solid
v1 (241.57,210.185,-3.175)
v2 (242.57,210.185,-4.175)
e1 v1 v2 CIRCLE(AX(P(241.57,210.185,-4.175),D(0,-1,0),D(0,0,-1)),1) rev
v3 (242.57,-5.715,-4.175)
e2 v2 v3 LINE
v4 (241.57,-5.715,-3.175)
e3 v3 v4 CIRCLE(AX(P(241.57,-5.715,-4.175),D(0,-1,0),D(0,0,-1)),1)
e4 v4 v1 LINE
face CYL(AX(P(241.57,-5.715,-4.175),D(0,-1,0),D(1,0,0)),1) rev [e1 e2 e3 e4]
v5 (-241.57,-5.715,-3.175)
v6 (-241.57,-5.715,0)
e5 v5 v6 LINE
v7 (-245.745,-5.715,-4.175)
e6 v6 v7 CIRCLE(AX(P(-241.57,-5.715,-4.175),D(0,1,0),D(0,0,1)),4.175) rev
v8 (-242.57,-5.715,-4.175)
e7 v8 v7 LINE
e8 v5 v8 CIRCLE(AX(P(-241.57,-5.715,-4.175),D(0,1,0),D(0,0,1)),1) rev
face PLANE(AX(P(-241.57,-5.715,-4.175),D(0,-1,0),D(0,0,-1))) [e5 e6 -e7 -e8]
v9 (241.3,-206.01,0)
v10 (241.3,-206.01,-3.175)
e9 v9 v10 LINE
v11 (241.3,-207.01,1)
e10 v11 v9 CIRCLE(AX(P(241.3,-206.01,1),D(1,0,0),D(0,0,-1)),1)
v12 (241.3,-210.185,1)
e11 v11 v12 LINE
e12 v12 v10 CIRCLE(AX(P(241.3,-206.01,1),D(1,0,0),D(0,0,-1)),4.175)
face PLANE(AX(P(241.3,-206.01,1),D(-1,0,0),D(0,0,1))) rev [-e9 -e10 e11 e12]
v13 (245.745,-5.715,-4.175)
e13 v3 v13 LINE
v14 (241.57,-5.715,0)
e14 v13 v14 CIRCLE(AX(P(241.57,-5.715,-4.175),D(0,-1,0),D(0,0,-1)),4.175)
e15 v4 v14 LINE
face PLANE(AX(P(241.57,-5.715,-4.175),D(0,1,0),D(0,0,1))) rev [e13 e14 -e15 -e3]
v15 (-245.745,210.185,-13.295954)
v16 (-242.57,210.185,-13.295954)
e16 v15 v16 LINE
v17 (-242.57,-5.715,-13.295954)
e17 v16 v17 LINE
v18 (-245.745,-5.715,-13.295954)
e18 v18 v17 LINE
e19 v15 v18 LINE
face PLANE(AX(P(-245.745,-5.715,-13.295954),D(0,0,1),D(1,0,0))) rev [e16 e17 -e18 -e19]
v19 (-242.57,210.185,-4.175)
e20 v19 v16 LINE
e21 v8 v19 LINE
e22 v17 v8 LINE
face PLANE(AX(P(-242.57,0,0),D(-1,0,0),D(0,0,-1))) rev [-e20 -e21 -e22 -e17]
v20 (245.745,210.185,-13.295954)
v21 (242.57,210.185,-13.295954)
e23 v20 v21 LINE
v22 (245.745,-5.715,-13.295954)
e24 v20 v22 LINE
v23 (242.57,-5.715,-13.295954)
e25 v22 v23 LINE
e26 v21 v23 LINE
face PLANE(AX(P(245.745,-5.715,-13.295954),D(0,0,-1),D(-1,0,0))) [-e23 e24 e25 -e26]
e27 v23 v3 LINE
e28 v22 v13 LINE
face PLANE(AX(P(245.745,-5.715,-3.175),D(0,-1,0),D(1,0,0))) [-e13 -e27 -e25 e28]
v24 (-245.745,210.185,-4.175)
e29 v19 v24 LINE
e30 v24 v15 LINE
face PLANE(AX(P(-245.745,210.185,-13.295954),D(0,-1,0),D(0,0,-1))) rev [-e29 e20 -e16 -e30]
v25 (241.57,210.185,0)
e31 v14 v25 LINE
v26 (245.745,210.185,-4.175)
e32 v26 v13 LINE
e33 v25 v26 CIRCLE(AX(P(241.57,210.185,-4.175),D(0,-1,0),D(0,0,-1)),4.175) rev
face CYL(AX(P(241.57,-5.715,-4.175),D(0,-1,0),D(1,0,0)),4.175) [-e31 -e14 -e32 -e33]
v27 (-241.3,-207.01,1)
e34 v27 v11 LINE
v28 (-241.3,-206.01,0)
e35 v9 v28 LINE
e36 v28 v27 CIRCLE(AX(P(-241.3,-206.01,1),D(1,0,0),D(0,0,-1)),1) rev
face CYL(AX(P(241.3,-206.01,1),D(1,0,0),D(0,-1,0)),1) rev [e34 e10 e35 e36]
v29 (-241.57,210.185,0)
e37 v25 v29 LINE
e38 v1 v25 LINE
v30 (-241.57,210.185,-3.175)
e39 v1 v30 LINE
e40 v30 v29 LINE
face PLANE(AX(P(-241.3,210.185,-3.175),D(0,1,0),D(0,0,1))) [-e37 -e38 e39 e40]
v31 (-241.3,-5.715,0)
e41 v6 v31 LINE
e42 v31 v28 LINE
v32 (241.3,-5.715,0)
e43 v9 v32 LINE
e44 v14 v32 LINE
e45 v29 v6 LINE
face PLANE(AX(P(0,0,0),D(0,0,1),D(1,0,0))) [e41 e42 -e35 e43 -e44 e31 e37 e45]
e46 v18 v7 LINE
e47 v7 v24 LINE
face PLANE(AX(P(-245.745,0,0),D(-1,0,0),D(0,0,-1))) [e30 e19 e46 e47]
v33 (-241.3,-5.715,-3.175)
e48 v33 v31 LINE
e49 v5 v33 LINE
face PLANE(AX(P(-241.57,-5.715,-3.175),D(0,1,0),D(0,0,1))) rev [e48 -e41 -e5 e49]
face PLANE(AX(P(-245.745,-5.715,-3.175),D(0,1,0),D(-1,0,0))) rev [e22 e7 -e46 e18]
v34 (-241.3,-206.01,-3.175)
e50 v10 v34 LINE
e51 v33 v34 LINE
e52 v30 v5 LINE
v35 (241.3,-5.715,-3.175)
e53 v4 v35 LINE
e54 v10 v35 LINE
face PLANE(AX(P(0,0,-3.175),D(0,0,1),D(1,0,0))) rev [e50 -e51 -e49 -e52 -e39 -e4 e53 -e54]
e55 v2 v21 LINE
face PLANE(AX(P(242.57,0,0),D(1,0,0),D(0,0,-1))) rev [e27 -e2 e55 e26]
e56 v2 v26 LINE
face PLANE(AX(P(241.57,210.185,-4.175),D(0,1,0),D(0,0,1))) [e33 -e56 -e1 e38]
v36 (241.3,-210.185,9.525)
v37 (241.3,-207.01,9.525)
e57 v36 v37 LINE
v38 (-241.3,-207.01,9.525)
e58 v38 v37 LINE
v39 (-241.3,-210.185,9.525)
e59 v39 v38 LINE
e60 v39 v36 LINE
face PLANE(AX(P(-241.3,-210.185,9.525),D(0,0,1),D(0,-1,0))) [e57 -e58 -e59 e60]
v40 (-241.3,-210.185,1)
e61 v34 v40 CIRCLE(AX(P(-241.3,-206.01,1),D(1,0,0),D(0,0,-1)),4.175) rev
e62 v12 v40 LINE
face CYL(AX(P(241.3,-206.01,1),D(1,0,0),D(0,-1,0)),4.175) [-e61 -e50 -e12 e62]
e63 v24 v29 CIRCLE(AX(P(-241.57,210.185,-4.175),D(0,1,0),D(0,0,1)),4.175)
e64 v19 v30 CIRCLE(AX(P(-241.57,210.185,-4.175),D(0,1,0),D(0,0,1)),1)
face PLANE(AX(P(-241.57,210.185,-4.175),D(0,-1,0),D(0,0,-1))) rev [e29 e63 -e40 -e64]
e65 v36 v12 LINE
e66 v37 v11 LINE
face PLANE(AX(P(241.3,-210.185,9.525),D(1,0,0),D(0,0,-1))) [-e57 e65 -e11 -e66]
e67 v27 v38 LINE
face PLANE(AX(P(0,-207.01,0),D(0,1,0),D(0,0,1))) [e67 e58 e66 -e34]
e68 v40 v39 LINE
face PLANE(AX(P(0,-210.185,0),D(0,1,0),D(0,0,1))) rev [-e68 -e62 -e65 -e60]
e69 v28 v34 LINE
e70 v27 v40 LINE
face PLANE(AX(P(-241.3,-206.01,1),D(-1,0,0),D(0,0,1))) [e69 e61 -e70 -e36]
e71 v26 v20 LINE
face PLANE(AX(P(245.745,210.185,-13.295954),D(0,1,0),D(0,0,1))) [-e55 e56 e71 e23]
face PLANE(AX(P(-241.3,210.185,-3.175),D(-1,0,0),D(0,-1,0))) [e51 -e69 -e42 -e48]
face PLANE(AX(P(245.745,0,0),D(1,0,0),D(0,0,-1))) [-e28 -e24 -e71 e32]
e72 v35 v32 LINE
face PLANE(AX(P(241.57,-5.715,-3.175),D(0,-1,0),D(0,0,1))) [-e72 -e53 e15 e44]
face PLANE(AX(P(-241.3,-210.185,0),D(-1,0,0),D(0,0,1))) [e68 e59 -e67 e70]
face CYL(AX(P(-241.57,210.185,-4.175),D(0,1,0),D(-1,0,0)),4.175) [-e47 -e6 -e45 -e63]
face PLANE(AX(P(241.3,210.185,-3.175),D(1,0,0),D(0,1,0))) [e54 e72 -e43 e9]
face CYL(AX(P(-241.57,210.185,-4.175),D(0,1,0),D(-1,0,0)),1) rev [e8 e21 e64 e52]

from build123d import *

# Parameters (mm, degrees)
SKETCH1_W                    = 482.6
SKETCH1_H                    = 420.37
BASE_FLANGE1_DEPTH           = 3.175
EDGE_FLANGE1_STRIP_W         = 14.7
EDGE_FLANGE1_STRIP_H         = 3.175
EDGE_FLANGE1_STRIP_CUT_DEPTH = 482.6
EDGE_FLANGE1_DEPTH           = 482.6
EDGE_FLANGE3_DEPTH           = 215.9


# Sheet-metal steps are written as plain solids
with BuildPart() as part:
    # Sketch1 → Base-Flange1 (new body)
    with BuildSketch(Plane.XY):
        Rectangle(SKETCH1_W, SKETCH1_H)
    extrude(amount=-BASE_FLANGE1_DEPTH)

    # Edge-Flange1 strip (across the edge) → Edge-Flange1 strip cut (cut)
    with BuildSketch(Plane(origin=(-241.3, -210.185, 0), x_dir=(0, 1, 0), z_dir=(1, 0, 0))):
        with Locations((-3.175, -1.5875)):
            Rectangle(EDGE_FLANGE1_STRIP_W, EDGE_FLANGE1_STRIP_H)
    extrude(amount=EDGE_FLANGE1_STRIP_CUT_DEPTH, mode=Mode.SUBTRACT)

    # Edge-Flange1 section (across the edge) → Edge-Flange1 (add)
    with BuildSketch(Plane(origin=(-241.3, -210.185, 0), x_dir=(0, 1, 0), z_dir=(1, 0, 0))):
        with BuildLine():
            Line((0, 1), (0, 9.525))
            Line((0, 9.525), (3.175, 9.525))
            Line((3.175, 9.525), (3.175, 1))
            ThreePointArc((3.175, 1), (3.467893219, 0.292893219), (4.175, 0))
            Line((4.175, 0), (4.175, -3.175))
            ThreePointArc((4.175, -3.175), (1.222829189, -1.952170811), (0, 1))
        make_face()
    extrude(amount=EDGE_FLANGE1_DEPTH)

    # Edge-Flange3 section (across the edge) → Edge-Flange3 (add)
    with BuildSketch(Plane(origin=(242.57, 210.185, -3.175), x_dir=(-1, 0, 0), z_dir=(0, -1, 0))):
        with BuildLine():
            Line((-3.175, 1), (-3.175, 10.120953567))
            Line((-3.175, 10.120953567), (0, 10.120953567))
            Line((0, 10.120953567), (0, 1))
            ThreePointArc((0, 1), (0.292893219, 0.292893219), (1, 0))
            Line((1, 0), (1.27, 0))
            Line((1.27, 0), (1.27, -3.175))
            Line((1.27, -3.175), (1, -3.175))
            ThreePointArc((1, -3.175), (-1.952170811, -1.952170811), (-3.175, 1))
        make_face()
    edge_flange3 = extrude(amount=EDGE_FLANGE3_DEPTH)

    # Mirror2: Edge-Flange3 across plane
    add(edge_flange3.mirror(Plane(origin=(0, 0, 0), x_dir=(0, 0, 1), z_dir=(1, 0, 0))))


solid = part.part
